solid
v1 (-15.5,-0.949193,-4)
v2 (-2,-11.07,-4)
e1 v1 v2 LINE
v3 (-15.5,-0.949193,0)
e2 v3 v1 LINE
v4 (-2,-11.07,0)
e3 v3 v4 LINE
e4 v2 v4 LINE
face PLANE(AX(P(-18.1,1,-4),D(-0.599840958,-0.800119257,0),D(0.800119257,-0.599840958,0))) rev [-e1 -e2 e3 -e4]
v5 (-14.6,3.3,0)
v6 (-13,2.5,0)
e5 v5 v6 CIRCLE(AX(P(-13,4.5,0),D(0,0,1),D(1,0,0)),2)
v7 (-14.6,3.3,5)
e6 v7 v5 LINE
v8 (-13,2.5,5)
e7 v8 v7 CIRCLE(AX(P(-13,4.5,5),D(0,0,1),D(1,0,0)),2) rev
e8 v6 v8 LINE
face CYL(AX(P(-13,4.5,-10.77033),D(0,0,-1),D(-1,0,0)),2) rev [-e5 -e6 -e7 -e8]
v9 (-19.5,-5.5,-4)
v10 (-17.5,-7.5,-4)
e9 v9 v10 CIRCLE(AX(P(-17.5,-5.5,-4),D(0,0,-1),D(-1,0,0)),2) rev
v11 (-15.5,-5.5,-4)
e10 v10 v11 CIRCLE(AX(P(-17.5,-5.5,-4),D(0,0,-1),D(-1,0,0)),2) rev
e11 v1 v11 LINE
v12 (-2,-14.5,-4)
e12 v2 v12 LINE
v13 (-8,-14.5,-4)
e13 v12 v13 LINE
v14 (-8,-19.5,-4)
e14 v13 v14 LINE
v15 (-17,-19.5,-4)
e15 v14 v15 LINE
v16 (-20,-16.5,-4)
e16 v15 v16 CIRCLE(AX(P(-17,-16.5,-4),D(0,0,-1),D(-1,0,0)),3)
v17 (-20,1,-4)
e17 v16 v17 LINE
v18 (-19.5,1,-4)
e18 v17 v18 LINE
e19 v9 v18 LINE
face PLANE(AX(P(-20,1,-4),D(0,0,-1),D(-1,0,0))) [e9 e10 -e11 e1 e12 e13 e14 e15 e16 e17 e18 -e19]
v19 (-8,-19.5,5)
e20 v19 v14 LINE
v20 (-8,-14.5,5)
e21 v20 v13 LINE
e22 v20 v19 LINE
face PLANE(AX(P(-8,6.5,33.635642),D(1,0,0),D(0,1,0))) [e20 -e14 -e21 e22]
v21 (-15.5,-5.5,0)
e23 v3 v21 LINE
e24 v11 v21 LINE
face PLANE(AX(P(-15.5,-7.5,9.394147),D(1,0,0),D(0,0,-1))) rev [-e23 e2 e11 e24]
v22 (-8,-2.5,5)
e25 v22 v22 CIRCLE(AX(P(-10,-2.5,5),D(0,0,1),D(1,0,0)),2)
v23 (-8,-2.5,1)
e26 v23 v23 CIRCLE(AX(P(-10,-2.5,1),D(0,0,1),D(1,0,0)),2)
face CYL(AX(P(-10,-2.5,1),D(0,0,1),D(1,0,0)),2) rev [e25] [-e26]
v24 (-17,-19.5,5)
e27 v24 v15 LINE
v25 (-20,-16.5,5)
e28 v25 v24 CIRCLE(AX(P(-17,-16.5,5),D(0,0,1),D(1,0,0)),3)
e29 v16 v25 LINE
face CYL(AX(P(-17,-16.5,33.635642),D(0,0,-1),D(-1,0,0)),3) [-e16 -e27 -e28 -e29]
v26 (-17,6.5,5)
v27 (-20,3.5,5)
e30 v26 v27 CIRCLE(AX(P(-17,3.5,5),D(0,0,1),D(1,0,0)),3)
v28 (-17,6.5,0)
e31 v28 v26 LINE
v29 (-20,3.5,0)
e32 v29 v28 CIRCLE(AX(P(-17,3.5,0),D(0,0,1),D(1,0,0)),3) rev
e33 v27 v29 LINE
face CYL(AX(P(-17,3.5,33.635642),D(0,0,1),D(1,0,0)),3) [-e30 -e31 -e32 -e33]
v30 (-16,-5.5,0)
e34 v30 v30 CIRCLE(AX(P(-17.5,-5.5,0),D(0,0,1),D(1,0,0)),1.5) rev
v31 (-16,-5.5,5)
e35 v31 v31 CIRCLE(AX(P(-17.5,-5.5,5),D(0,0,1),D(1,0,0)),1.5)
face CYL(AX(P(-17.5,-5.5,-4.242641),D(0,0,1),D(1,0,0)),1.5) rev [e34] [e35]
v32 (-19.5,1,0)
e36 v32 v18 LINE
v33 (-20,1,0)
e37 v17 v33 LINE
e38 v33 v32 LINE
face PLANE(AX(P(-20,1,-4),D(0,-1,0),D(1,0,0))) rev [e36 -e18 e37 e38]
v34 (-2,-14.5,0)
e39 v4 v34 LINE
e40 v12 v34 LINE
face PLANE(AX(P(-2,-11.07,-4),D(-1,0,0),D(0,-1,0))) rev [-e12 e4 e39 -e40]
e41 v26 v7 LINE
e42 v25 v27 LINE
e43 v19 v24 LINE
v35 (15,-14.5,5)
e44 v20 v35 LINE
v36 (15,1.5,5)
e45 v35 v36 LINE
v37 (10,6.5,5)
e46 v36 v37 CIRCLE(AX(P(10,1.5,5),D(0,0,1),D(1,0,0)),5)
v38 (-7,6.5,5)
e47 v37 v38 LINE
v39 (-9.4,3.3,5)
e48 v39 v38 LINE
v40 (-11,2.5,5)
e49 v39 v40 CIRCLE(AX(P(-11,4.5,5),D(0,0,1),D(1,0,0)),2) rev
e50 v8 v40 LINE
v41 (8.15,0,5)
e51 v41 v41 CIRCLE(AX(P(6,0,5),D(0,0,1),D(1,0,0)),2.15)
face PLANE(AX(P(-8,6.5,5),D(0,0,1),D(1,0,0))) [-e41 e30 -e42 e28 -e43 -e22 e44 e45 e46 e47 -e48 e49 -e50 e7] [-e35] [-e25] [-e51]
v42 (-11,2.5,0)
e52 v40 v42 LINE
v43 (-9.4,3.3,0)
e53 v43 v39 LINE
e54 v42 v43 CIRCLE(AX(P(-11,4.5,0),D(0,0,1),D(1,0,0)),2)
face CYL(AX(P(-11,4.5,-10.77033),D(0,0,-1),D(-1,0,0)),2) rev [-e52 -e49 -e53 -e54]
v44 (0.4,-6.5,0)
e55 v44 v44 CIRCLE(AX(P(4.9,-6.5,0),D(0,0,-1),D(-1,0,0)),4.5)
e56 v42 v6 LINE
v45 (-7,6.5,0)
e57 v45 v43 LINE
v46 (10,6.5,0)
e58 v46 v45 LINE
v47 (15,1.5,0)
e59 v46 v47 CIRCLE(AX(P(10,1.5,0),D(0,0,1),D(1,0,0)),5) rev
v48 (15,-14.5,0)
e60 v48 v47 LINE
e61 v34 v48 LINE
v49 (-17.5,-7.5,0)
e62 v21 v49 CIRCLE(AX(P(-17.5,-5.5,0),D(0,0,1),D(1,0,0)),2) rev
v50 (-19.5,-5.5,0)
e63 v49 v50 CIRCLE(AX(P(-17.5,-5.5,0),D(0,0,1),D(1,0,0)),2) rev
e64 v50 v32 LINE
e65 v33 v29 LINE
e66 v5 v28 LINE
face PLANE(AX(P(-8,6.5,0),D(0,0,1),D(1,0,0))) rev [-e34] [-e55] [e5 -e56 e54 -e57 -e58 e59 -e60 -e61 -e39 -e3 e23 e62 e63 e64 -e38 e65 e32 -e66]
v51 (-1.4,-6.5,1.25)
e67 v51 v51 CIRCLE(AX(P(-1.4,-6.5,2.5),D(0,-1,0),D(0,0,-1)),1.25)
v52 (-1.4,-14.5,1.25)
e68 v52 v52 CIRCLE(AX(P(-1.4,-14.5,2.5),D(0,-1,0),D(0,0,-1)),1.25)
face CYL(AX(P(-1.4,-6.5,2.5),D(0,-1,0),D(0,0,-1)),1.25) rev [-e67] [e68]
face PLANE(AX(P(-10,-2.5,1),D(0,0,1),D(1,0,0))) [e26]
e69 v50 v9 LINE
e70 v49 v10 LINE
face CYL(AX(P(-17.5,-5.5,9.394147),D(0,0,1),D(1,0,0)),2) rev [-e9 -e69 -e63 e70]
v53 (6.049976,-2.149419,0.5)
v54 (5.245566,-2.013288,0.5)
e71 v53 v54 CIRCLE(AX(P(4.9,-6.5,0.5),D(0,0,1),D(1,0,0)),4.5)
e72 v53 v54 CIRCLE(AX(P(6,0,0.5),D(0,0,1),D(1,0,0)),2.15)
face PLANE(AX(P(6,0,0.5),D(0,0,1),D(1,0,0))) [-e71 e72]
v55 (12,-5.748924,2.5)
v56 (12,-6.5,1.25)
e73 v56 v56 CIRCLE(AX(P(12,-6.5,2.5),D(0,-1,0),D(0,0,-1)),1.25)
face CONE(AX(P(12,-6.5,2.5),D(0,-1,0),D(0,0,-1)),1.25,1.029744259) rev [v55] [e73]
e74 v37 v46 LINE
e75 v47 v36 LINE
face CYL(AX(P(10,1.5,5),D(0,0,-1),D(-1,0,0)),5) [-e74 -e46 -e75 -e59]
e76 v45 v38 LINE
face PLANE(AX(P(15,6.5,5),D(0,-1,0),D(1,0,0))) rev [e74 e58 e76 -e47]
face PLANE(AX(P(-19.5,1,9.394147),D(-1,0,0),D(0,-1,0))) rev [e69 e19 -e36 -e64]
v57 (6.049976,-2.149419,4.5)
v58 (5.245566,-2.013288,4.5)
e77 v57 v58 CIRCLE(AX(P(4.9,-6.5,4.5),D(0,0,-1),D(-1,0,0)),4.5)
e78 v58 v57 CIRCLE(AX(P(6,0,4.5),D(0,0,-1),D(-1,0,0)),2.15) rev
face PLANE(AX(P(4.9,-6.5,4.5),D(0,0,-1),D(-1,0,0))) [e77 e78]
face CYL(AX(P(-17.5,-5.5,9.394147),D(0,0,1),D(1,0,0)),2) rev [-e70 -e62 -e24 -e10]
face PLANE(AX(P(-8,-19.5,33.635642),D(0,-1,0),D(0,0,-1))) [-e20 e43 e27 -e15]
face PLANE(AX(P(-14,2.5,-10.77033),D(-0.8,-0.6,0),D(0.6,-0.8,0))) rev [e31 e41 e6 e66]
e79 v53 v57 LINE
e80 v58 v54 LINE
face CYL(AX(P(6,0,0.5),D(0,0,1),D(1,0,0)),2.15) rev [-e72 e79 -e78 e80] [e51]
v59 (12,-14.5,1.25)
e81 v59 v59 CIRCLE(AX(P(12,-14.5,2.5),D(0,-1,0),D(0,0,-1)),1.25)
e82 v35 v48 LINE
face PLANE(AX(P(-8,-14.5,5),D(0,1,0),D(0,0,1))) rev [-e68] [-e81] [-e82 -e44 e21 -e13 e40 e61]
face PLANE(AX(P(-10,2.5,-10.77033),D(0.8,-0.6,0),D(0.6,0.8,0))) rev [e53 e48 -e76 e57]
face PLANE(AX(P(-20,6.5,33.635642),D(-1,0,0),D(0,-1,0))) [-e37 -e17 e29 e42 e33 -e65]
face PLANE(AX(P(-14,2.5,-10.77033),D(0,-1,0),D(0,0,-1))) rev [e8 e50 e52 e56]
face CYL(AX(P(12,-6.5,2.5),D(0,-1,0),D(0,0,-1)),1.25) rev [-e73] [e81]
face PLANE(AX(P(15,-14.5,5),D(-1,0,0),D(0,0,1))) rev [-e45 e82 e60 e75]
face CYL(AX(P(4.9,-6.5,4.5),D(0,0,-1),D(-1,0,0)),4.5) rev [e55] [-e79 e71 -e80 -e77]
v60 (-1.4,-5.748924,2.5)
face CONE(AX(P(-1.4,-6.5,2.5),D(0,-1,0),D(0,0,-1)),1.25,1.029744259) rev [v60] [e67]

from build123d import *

# Parameters (mm, degrees)
SKETCH1_W             = 23
SKETCH1_H             = 21
EXTRUDE1_DEPTH        = 5
SKETCH2_R             = 2.15
EXTRUDE2_DEPTH        = 4.5
SKETCH4_R             = 1.25
EXTRUDE4_DEPTH        = 8
FILLET1_R             = 5
SKETCH6_R             = 4.5
EXTRUDE6_DEPTH        = 4.5
SKETCH9_W             = 12
SKETCH9_H             = 26
EXTRUDE9_DEPTH        = 5
SKETCH11_R            = 1.5
EXTRUDE11_DEPTH       = 5
SKETCH10_R            = 2
EXTRUDE10_DEPTH       = 4
M3_TAPPED_HOLE1_D     = 2.5
M3_TAPPED_HOLE1_DEPTH = 8
M3_TAPPED_HOLE1_TIP   = 0.751075774
EXTRUDE12_DEPTH       = 4
FILLET3_R             = 3
EXTRUDE14_DEPTH       = 4
FILLET4_R             = 2
EXTRUDE15_DEPTH       = 5
FILLET6_R             = 2


with BuildPart() as part:
    # Sketch1 → Extrude1 (new body)
    with BuildSketch(Plane.XY):
        with Locations((3.5, -4)):
            Rectangle(SKETCH1_W, SKETCH1_H)
    extrude(amount=EXTRUDE1_DEPTH)

    # Sketch2 → Extrude2 (cut)
    with BuildSketch(Plane.XY.offset(5)):
        with Locations((6, 0)):
            Circle(SKETCH2_R)
    extrude(amount=-EXTRUDE2_DEPTH, mode=Mode.SUBTRACT)

    # Sketch4 → Extrude4 (cut)
    with BuildSketch(Plane.XZ.offset(14.5)):
        with Locations(Location((-1.4, 2.5, 0), (0, 0, 270))):
            Circle(SKETCH4_R)
        with Locations(Location((12, 2.5, 0), (0, 0, 270))):
            Circle(SKETCH4_R)
    extrude(amount=-EXTRUDE4_DEPTH, mode=Mode.SUBTRACT)

    # Fillet1
    fillet1_edges = [part.edges().sort_by_distance(p)[0] for p in [
        (15, 6.5, 2.5),
    ]]
    fillet(fillet1_edges, radius=FILLET1_R)

    # Sketch6 → Extrude6 (cut)
    with BuildSketch(Plane(origin=(0, 0, 0), x_dir=(-1, 0, 0), z_dir=(0, 0, -1))):
        with Locations((-4.9, -6.5)):
            Circle(SKETCH6_R)
    extrude(amount=-EXTRUDE6_DEPTH, mode=Mode.SUBTRACT)

    # Sketch9 → Extrude9 (add)
    with BuildSketch(Plane(origin=(0, 0, 0), x_dir=(-1, 0, 0), z_dir=(0, 0, -1))):
        with Locations((14, -6.5)):
            Rectangle(SKETCH9_W, SKETCH9_H)
    extrude(amount=-EXTRUDE9_DEPTH)

    # Sketch11 → Extrude11 (cut)
    with BuildSketch(Plane.XY.offset(5)):
        with Locations((-17.5, -5.5)):
            Circle(SKETCH11_R)
    extrude(amount=-EXTRUDE11_DEPTH, mode=Mode.SUBTRACT)

    # Sketch10 → Extrude10 (cut)
    with BuildSketch(Plane.XY.offset(5)):
        with Locations((-10, -2.5)):
            Circle(SKETCH10_R)
    extrude(amount=-EXTRUDE10_DEPTH, mode=Mode.SUBTRACT)

    # M3 Tapped Hole1
    with Locations(Plane(origin=(-1.4, -14.5, 2.5), x_dir=(0, 0, -1), z_dir=(0, -1, 0))):
        with Locations((0, 0), (0, 13.4)):
            Hole(M3_TAPPED_HOLE1_D / 2, depth=M3_TAPPED_HOLE1_DEPTH)
            with Locations((0, 0, -(M3_TAPPED_HOLE1_DEPTH + M3_TAPPED_HOLE1_TIP / 2))):  # 118° drill point
                Cone(0, M3_TAPPED_HOLE1_D / 2, M3_TAPPED_HOLE1_TIP, mode=Mode.SUBTRACT)

    # Sketch13 → Extrude12 (add)
    with BuildSketch(Plane(origin=(0, 0, 0), x_dir=(-1, 0, 0), z_dir=(0, 0, -1))):
        Polygon((20, -19.5), (8, -19.5), (8, -14.5), (2, -14.5), (2, -11.07), (18.1, 1), (20, 1), align=None)
    extrude(amount=EXTRUDE12_DEPTH)

    # Fillet3
    fillet3_edges = [part.edges().sort_by_distance(p)[0] for p in [
        (-20, -19.5, 0.5),
        (-20, 6.5, 2.5),
    ]]
    fillet(fillet3_edges, radius=FILLET3_R)

    # Sketch14 → Extrude14 (cut)
    with BuildSketch(Plane(origin=(0, 0, -4), x_dir=(-1, 0, 0), z_dir=(0, 0, -1))):
        Polygon((19.5, 1), (19.5, -7.5), (15.5, -7.5), (15.5, -0.949192547), (18.1, 1), align=None)
    extrude(amount=-EXTRUDE14_DEPTH, mode=Mode.SUBTRACT)

    # Fillet4
    fillet4_edges = [part.edges().sort_by_distance(p)[0] for p in [
        (-19.5, -7.5, -2),
        (-15.5, -7.5, -2),
    ]]
    fillet(fillet4_edges, radius=FILLET4_R - 0.0001)  # a hair under: the kernel refuses the full size

    # Sketch15 → Extrude15 (cut)
    with BuildSketch(Plane.XY.offset(5)):
        Polygon((-14, 2.5), (-17, 6.5), (-7, 6.5), (-10, 2.5), align=None)
    extrude(amount=-EXTRUDE15_DEPTH, mode=Mode.SUBTRACT)

    # Fillet6
    fillet6_edges = [part.edges().sort_by_distance(p)[0] for p in [
        (-10, 2.5, 2.5),
        (-14, 2.5, 2.5),
    ]]
    fillet(fillet6_edges, radius=FILLET6_R)


solid = part.part
